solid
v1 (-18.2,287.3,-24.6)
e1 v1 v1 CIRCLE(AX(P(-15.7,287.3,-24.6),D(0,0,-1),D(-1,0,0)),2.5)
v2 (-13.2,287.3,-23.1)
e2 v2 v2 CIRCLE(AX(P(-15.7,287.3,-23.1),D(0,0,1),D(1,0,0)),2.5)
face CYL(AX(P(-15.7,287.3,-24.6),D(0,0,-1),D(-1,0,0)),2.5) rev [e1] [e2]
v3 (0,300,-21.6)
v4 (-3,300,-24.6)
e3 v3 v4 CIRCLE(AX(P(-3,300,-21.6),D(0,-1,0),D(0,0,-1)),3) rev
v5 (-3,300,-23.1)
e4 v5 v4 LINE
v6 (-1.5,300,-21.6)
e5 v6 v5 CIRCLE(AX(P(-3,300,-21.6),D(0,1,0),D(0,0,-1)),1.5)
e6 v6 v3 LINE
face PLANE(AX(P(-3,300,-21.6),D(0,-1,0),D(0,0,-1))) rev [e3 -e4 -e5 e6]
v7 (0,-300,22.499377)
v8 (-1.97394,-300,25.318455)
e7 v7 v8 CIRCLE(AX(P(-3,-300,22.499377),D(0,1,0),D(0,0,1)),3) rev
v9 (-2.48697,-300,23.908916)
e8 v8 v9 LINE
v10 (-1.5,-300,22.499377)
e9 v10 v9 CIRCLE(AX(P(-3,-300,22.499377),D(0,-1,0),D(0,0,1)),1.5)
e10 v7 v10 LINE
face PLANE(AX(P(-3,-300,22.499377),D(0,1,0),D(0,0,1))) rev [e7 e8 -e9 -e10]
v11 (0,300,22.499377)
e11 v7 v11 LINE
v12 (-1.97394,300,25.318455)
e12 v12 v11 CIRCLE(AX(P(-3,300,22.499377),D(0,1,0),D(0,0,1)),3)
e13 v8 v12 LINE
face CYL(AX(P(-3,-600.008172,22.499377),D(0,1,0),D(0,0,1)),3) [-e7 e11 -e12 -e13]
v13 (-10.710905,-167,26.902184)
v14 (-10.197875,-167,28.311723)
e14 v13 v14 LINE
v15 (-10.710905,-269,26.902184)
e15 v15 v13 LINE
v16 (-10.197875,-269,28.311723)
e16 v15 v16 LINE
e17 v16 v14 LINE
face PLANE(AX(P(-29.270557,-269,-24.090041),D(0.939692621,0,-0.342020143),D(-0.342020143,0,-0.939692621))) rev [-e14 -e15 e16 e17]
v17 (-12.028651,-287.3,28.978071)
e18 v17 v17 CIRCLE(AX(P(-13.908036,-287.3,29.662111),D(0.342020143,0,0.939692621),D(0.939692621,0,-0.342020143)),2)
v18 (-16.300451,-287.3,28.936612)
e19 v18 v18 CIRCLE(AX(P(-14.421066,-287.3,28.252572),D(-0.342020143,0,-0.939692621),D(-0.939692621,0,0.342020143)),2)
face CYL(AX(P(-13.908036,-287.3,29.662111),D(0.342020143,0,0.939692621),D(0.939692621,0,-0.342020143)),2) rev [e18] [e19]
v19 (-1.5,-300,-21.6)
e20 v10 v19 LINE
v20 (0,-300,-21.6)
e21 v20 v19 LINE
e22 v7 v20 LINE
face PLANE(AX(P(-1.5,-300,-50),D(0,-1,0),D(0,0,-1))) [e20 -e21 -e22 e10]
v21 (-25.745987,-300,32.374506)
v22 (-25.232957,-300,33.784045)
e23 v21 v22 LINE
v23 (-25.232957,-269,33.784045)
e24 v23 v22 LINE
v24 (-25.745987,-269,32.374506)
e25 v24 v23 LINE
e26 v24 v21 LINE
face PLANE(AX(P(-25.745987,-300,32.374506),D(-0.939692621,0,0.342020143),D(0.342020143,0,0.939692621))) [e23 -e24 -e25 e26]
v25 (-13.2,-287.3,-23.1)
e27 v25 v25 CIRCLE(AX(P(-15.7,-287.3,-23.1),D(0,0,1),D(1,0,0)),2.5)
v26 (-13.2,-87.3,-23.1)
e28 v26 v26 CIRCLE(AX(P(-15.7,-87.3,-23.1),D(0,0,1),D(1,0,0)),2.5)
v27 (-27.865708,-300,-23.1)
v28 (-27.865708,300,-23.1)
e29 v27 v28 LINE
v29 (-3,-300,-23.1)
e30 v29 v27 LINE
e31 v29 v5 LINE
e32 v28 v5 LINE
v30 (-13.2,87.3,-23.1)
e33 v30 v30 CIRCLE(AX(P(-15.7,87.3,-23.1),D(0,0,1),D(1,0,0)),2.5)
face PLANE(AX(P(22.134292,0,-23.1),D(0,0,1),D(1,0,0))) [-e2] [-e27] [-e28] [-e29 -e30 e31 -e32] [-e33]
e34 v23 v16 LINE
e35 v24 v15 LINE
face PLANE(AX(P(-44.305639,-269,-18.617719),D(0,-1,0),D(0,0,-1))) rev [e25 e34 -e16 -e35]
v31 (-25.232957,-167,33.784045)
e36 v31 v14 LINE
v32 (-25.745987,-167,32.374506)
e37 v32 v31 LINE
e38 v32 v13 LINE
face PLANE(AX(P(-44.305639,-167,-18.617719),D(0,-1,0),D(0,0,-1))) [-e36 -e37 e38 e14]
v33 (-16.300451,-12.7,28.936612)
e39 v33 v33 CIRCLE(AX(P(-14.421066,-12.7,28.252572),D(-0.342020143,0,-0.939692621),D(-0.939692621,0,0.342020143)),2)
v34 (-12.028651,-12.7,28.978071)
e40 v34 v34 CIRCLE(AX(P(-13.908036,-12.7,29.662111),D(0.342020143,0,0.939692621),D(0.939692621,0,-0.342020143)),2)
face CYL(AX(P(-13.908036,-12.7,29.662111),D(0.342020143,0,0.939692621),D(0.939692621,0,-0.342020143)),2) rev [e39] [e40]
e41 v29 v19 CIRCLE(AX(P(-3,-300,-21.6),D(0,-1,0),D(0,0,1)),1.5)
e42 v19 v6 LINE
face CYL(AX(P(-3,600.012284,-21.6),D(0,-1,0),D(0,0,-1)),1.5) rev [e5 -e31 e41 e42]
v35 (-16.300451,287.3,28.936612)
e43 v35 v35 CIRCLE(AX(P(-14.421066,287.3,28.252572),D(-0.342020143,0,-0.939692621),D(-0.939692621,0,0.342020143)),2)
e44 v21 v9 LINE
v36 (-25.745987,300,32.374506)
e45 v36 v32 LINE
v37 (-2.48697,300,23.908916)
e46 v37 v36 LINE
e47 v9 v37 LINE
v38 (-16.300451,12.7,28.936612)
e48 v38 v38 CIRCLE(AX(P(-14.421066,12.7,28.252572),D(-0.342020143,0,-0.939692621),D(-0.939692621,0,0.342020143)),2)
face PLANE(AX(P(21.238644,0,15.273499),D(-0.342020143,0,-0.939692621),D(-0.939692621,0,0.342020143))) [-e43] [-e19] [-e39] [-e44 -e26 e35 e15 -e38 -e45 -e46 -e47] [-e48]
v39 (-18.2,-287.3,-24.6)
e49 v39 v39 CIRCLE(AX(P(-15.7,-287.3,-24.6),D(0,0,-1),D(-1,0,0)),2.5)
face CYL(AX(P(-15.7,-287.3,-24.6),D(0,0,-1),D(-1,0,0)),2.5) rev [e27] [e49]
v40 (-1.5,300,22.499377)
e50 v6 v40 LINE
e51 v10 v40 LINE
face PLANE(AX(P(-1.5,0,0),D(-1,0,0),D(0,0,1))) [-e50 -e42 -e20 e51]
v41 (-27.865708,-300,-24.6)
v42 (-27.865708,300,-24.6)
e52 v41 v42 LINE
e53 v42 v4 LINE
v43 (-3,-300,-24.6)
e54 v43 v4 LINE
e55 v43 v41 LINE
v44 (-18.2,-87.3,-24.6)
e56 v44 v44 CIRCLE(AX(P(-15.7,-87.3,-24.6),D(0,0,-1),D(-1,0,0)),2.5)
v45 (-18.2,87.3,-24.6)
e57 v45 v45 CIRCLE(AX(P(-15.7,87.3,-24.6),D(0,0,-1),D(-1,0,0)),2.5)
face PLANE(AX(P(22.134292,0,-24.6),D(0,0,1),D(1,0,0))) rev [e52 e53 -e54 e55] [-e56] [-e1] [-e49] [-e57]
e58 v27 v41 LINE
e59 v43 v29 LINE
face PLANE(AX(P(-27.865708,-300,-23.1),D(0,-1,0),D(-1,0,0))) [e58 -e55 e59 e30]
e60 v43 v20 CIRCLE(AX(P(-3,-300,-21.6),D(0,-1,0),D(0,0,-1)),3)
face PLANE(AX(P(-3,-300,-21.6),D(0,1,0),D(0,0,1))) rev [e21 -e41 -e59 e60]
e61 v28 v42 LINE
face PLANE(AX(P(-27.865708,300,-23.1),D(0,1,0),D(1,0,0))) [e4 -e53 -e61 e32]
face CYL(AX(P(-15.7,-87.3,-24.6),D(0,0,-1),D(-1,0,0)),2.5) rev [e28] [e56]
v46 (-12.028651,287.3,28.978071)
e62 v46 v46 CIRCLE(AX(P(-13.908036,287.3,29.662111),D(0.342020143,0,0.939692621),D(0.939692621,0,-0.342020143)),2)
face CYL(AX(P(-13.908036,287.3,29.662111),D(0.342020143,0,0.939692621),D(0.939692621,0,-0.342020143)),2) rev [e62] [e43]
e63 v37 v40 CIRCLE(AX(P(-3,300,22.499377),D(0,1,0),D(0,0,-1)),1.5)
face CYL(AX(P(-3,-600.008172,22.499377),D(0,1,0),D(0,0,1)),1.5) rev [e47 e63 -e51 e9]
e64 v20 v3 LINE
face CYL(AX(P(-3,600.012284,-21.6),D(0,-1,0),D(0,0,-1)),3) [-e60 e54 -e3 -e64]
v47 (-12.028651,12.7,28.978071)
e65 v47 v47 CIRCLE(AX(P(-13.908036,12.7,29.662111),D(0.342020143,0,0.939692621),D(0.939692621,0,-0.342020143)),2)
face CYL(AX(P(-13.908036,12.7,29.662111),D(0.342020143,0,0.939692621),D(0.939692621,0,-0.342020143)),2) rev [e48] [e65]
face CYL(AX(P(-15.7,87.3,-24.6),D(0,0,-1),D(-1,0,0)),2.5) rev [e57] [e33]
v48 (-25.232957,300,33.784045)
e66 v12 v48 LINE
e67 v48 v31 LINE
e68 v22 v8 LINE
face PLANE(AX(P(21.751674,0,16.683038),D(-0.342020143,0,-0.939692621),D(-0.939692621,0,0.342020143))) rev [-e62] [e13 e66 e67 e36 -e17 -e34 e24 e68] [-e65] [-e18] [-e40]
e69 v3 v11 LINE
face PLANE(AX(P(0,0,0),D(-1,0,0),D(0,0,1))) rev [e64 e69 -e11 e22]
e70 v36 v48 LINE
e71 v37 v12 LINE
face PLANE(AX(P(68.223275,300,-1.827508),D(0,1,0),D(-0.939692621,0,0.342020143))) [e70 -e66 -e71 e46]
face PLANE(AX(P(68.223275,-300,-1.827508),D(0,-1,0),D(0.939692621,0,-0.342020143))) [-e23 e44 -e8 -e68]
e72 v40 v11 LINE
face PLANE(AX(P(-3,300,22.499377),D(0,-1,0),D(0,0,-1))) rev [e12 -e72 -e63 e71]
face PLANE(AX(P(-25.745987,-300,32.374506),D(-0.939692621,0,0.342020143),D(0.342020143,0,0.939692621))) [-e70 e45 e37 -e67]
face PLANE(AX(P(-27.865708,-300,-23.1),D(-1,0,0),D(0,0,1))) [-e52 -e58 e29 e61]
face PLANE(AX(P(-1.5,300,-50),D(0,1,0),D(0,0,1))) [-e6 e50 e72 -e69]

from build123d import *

# Parameters (mm, degrees)
SKETCH1_W                    = 600
SKETCH1_H                    = 100
BASE_FLANGE1_DEPTH           = 1.5
SKETCHED_START               = -300
SKETCHED_BEND1_DEPTH         = 600
SKETCHED_BEND1_2_DEPTH       = 600
SKETCHED_BEND2_DEPTH         = 600
SKETCHED_BEND2_2_DEPTH       = 600
F_4_0_4_DIAMETER_HOLE1_D     = 4
F_5_0_5_DIAMETER_HOLE1_D     = 5
F_5_0_5_DIAMETER_HOLE1_DEPTH = 1.5
CUT_EXTRUDE1_REACH           = 307.656
SKETCH12_W                   = 102
SKETCH12_H                   = 16


# Read off the part's stored shape, not the designer's step: Sketched Bend1, Sketched Bend2
# Sheet-metal steps are written as plain solids
with BuildPart() as part:
    # Sketch1 → Base-Flange1 (new body)
    with BuildSketch(Plane.YZ):
        Rectangle(SKETCH1_W, SKETCH1_H)
    extrude(amount=-BASE_FLANGE1_DEPTH)

    # Sketched Bend1 outline → Sketched Bend1 (cut)
    with BuildSketch(Plane(origin=(0, 0, 0), x_dir=(1, 0, 0), z_dir=(0, 1, 0)).offset(SKETCHED_START)):
        with BuildLine():
            Line((-1.5, 50), (-1.5, 24.198076212))
            ThreePointArc((-1.5, 24.198076212), (-0.401923788, 23.1), (0, 21.6))
            Line((0, 21.6), (0, 50))
            Line((0, 50), (-1.5, 50))
        make_face()
    extrude(amount=SKETCHED_BEND1_DEPTH, mode=Mode.SUBTRACT)

    # Sketched Bend1 2 outline → Sketched Bend1 2 (add)
    with BuildSketch(Plane(origin=(0, 0, 0), x_dir=(1, 0, 0), z_dir=(0, 1, 0)).offset(SKETCHED_START)):
        with BuildLine():
            Line((-27.865708265, 24.6), (-27.865708265, 23.1))
            Line((-27.865708265, 23.1), (-3, 23.1))
            ThreePointArc((-3, 23.1), (-1.939339828, 22.660660172), (-1.5, 21.6))
            Line((-1.5, 21.6), (-1.5, 24.198076212))
            ThreePointArc((-1.5, 24.198076212), (-2.223542865, 24.497777479), (-3, 24.6))
            Line((-3, 24.6), (-27.865708265, 24.6))
        make_face()
    extrude(amount=SKETCHED_BEND1_2_DEPTH)

    # Sketched Bend2 outline → Sketched Bend2 (cut)
    with BuildSketch(Plane(origin=(0, 0, 0), x_dir=(1, 0, 0), z_dir=(0, 1, 0)).offset(SKETCHED_START)):
        with BuildLine():
            ThreePointArc((0, -22.499377385), (-0.401923789, -23.999377385), (-1.5, -25.097453597))
            Line((-1.5, -25.097453597), (-1.5, -50))
            Line((-1.5, -50), (0, -50))
            Line((0, -50), (0, -22.499377385))
        make_face()
    extrude(amount=SKETCHED_BEND2_DEPTH, mode=Mode.SUBTRACT)

    # Sketched Bend2 2 outline → Sketched Bend2 2 (add)
    with BuildSketch(Plane(origin=(0, 0, 0), x_dir=(1, 0, 0), z_dir=(0, 1, 0)).offset(SKETCHED_START)):
        with BuildLine():
            ThreePointArc((-1.5, -22.499377385), (-1.771271934, -23.35974204), (-2.486969785, -23.908916317))
            Line((-2.486969785, -23.908916317), (-25.745986918, -32.374506231))
            Line((-25.745986918, -32.374506231), (-25.232956703, -33.784045162))
            Line((-25.232956703, -33.784045162), (-1.97393957, -25.318455248))
            ThreePointArc((-1.97393957, -25.318455248), (-1.732145215, -25.218300747), (-1.5, -25.097453597))
            Line((-1.5, -25.097453597), (-1.5, -22.499377385))
        make_face()
    extrude(amount=SKETCHED_BEND2_2_DEPTH)

    # Ø4.0 (4) Diameter Hole1 (through all)
    with Locations(Plane(origin=(7.906287599, 0, 21.72234665), x_dir=(0.9396926207859094, 0, -0.34202014332566616), z_dir=(0.34202014332566616, 0, 0.9396926207859094))):
        with Locations((-23.21431814, 287.3), (-23.21431814, 12.7)):
            f_4_0_4_diameter_hole1 = Hole(F_4_0_4_DIAMETER_HOLE1_D / 2)

    # Mirror1: Ø4.0 (4) Diameter Hole1 across plane
    add(f_4_0_4_diameter_hole1.mirror(Plane.ZX), mode=Mode.SUBTRACT)

    # Ø5.0 (5) Diameter Hole1
    with Locations(Plane.YX.offset(24.6)):
        with Locations((-287.3, -15.7), (-87.3, -15.7), (87.3, -15.7), (287.3, -15.7)):
            Hole(F_5_0_5_DIAMETER_HOLE1_D / 2, depth=F_5_0_5_DIAMETER_HOLE1_DEPTH)

    # Sketch12 → Cut-Extrude1 (cut, up to next)
    with BuildSketch(Plane(origin=(7.906287599, 0, 21.72234665), x_dir=(0, -1, 0), z_dir=(0.34202014332566616, 0, 0.9396926207859094)), mode=Mode.PRIVATE) as cut_extrude1_sk1:
        with Locations((218, -27.266047183)):
            Rectangle(SKETCH12_W, SKETCH12_H)
    cut_extrude1_tool1 = extrude(cut_extrude1_sk1.sketch, amount=-CUT_EXTRUDE1_REACH, mode=Mode.PRIVATE) & part.part
    add(cut_extrude1_tool1.solids().sort_by_distance((-17.715416, -218, 31.047884))[0], mode=Mode.SUBTRACT)


solid = part.part
